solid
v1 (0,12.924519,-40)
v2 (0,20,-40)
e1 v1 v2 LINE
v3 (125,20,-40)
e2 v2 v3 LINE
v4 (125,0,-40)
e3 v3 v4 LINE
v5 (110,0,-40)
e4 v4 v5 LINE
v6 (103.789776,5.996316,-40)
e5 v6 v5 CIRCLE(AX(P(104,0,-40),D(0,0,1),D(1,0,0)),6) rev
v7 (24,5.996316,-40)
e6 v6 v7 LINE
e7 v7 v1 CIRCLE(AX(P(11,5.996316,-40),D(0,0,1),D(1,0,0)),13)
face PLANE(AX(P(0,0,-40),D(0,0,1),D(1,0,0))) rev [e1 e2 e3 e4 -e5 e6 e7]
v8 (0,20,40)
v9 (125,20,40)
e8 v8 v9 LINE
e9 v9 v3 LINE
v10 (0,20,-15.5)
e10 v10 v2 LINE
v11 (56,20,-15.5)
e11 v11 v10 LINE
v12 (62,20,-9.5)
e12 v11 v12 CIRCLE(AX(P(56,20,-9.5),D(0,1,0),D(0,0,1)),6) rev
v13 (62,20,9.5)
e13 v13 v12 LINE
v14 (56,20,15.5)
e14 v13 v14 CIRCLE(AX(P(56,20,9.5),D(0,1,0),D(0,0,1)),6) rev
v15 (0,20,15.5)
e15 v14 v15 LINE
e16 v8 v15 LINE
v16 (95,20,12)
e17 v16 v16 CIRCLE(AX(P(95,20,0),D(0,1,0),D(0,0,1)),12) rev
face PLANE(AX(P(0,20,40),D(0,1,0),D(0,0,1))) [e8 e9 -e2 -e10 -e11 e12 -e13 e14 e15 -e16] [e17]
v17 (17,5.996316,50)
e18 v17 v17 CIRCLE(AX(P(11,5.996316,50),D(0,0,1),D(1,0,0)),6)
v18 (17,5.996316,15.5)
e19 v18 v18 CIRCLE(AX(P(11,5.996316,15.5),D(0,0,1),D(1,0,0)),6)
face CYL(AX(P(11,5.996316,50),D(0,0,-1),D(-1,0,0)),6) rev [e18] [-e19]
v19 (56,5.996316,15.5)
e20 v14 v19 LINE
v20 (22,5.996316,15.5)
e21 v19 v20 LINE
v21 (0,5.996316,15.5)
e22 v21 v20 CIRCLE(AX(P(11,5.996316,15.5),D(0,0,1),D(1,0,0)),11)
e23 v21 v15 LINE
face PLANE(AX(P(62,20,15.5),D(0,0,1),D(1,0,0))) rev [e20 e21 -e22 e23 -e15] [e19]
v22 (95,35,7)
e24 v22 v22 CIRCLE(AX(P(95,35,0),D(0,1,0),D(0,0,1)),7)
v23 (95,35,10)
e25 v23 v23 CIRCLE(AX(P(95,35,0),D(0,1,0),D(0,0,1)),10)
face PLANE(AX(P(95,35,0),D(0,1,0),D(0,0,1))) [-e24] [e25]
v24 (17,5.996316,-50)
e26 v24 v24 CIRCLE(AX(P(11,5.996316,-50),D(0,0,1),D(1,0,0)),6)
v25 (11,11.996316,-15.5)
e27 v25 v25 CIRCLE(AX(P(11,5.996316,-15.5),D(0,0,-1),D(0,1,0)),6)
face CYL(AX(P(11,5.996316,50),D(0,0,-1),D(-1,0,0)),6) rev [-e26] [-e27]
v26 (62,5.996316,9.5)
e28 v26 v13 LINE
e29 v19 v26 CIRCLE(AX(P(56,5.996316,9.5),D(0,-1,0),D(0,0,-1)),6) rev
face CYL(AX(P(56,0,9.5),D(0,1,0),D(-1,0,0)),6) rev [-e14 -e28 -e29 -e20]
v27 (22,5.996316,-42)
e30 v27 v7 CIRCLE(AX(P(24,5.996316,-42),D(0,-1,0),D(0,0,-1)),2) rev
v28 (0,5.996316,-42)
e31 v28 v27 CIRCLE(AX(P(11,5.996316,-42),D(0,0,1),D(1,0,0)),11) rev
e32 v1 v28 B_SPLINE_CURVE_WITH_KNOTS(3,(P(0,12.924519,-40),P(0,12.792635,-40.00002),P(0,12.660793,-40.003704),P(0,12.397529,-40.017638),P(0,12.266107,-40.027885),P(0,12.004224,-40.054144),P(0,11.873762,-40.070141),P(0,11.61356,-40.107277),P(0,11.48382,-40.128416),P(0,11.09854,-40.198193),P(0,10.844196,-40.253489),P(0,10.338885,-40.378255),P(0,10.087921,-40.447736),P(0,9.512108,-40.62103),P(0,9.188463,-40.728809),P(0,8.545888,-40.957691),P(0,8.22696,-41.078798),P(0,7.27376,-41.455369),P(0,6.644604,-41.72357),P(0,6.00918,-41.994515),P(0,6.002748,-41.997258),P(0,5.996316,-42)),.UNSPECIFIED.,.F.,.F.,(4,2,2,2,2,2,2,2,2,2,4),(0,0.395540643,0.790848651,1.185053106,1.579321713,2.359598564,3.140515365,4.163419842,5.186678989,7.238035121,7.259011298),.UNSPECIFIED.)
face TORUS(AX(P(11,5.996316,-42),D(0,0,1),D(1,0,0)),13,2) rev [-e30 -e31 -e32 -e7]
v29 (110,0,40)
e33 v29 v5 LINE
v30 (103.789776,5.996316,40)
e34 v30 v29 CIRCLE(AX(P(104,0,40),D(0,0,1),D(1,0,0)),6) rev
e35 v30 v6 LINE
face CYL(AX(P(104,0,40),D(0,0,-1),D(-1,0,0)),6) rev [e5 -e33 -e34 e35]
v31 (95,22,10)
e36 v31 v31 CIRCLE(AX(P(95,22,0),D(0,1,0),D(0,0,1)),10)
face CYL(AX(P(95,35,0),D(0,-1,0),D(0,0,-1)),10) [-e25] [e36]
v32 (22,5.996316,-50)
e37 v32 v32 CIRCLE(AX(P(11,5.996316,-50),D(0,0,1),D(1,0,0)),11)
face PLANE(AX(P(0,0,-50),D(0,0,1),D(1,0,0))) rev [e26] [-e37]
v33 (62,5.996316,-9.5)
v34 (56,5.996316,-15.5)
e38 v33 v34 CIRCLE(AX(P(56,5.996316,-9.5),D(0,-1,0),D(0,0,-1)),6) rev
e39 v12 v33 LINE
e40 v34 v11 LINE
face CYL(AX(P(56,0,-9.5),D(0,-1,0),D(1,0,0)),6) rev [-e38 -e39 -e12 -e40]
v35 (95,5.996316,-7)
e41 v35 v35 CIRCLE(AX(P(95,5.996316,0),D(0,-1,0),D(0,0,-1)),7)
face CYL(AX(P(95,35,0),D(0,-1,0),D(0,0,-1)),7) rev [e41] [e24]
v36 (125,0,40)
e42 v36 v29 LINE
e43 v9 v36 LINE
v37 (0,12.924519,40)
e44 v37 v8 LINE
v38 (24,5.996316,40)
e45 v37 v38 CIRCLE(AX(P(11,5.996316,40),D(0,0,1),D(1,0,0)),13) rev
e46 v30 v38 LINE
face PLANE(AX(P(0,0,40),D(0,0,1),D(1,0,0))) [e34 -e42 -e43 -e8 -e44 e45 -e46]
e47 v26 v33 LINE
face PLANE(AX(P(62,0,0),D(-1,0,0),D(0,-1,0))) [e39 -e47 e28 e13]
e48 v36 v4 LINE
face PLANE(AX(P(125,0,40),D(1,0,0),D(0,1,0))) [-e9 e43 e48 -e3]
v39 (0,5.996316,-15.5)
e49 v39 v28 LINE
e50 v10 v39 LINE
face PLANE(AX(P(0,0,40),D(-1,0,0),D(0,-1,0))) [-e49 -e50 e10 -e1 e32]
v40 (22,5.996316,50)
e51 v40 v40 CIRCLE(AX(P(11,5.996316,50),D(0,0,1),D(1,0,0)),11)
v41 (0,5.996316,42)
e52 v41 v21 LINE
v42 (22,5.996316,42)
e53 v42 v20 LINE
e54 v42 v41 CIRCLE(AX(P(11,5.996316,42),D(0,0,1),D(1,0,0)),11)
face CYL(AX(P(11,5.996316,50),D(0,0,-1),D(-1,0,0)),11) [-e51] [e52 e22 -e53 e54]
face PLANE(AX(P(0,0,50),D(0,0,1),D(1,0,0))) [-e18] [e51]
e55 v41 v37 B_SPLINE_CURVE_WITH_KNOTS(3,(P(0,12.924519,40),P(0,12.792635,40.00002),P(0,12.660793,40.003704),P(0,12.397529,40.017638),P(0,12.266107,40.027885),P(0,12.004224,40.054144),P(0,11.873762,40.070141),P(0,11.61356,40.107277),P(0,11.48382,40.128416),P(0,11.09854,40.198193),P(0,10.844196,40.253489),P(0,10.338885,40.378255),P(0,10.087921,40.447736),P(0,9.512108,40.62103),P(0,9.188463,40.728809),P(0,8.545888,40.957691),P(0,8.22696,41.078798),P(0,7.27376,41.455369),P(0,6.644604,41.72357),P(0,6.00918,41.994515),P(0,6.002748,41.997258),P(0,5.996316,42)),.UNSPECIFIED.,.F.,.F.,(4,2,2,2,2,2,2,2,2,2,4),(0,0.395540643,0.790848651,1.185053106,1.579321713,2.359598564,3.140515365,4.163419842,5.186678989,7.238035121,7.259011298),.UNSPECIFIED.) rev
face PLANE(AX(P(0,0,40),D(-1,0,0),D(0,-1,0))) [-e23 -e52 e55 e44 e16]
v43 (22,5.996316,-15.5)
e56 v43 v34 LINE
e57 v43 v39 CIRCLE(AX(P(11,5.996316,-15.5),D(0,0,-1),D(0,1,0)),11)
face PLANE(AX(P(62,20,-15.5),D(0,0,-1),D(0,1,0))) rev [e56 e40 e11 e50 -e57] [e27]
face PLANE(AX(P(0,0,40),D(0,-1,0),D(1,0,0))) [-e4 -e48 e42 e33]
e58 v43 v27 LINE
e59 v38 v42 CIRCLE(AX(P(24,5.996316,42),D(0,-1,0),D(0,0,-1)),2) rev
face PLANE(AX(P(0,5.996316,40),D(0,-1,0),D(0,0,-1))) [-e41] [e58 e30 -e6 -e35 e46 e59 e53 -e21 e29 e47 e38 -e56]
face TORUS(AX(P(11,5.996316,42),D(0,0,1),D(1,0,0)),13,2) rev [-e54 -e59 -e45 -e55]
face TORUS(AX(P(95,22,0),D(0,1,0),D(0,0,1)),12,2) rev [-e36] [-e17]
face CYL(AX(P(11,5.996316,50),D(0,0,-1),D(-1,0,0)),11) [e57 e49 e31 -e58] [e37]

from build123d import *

# Parameters (mm, degrees)
BOSS_EXTRUDE3_DEPTH = 40
SKETCH1_5_R         = 11
SKETCH1_5_R_2       = 6
BOSS_EXTRUDE4_DEPTH = 50
SKETCH3_W           = 31
SKETCH3_H           = 25.003683984
CUT_EXTRUDE1_DEPTH  = 62
SKETCH4_R           = 10
SKETCH4_R_2         = 7
BOSS_EXTRUDE5_DEPTH = 15
FILLET1_R           = 2
FILLET2_R           = 6
CUT_EXTRUDE2_START  = -15
SKETCH4_2_R         = 7
CUT_EXTRUDE2_DEPTH  = 15


with BuildPart() as part:
    # Sketch1 → Boss-Extrude3 (new, symmetric)
    with BuildSketch(Plane.XY):
        with BuildLine():
            Line((125, 20), (0, 20))
            Line((0, 20), (0, 5.996316016))
            ThreePointArc((0, 5.996316016), (11, 16.996316016), (22, 5.996316016))
            Line((22, 5.996316016), (103.789775753, 5.996316016))
            ThreePointArc((103.789775753, 5.996316016), (108.167652488, 4.316326302), (110, 0))
            Line((110, 0), (125, 0))
            Line((125, 0), (125, 20))
        make_face()
    extrude(amount=BOSS_EXTRUDE3_DEPTH, both=True)

    # Sketch1<5> → Boss-Extrude4 (add, symmetric)
    with BuildSketch(Plane.XY):
        with Locations((11, 5.996316016)):
            Circle(SKETCH1_5_R)
        with Locations((11, 5.996316016)):
            Circle(SKETCH1_5_R_2, mode=Mode.SUBTRACT)
    extrude(amount=BOSS_EXTRUDE4_DEPTH, both=True)

    # Sketch3 → Cut-Extrude1 (cut)
    with BuildSketch(Plane.ZY):
        with Locations((0, 7.498158008)):
            Rectangle(SKETCH3_W, SKETCH3_H)
    extrude(amount=-CUT_EXTRUDE1_DEPTH, mode=Mode.SUBTRACT)

    # Sketch4 → Boss-Extrude5 (add)
    with BuildSketch(Plane(origin=(0, 20, 0), x_dir=(1, 0, 0), z_dir=(0, 1, 0))):
        with Locations(Location((95, 0, 0), (0, 0, 270))):
            Circle(SKETCH4_R)
        with Locations(Location((95, 0, 0), (0, 0, 270))):
            Circle(SKETCH4_R_2, mode=Mode.SUBTRACT)
    extrude(amount=BOSS_EXTRUDE5_DEPTH)

    # Fillet1
    # the kernel refuses this fillet: 2 mm, written as the material it adds along each edge
    with BuildSketch(Plane(origin=(11, 5.996316016, 40), x_dir=(-1, 0, 0), z_dir=(0, -1, 0))) as fillet1_piece_1_section:
        with BuildLine():
            CenterArc((11 + FILLET1_R, -FILLET1_R), FILLET1_R, 90, 90)
            Line((11 + FILLET1_R, 0), (11, 0))
            Line((11, 0), (11, -FILLET1_R))
        make_face()
    fillet1_piece_1 = revolve(axis=Axis((11, 5.996316016, 40), (0, 0, -1)), revolution_arc=180, mode=Mode.PRIVATE)
    fillet1_piece_1 = split(fillet1_piece_1, bisect_by=Plane(origin=(0, 17.026812535, 41), z_dir=(1, 0, 0)), keep=Keep.TOP, mode=Mode.PRIVATE)
    add(fillet1_piece_1)
    with BuildSketch(Plane(origin=(95, 20, 0), x_dir=(0, 0, 1), z_dir=(-1, 0, 0))) as fillet1_piece_2:
        with BuildLine():
            CenterArc((10 + FILLET1_R, FILLET1_R), FILLET1_R, 180, 90)
            Line((10, FILLET1_R), (10, 0))
            Line((10, 0), (10 + FILLET1_R, 0))
        make_face()
    revolve(axis=Axis((95, 20, 0), (0, 1, 0)))
    with BuildSketch(Plane(origin=(11, 5.996316016, -40), x_dir=(-1, 0, 0), z_dir=(0, -1, 0))) as fillet1_piece_3_section:
        with BuildLine():
            CenterArc((11 + FILLET1_R, FILLET1_R), FILLET1_R, 180, 90)
            Line((11 + FILLET1_R, 0), (11, 0))
            Line((11, 0), (11, FILLET1_R))
        make_face()
    fillet1_piece_3 = revolve(axis=Axis((11, 5.996316016, -40), (0, 0, -1)), revolution_arc=180, mode=Mode.PRIVATE)
    fillet1_piece_3 = split(fillet1_piece_3, bisect_by=Plane(origin=(0, 17.026812535, -41), z_dir=(1, 0, 0)), keep=Keep.TOP, mode=Mode.PRIVATE)
    add(fillet1_piece_3)

    # Fillet2
    fillet2_edges = [part.edges().sort_by_distance(p)[0] for p in [
        (62, 12.998158008, -15.5),
        (62, 12.998158008, 15.5),
    ]]
    fillet(fillet2_edges, radius=FILLET2_R)

    # Sketch4<2> → Cut-Extrude2 (cut)
    with BuildSketch(Plane(origin=(0, 20, 0), x_dir=(1, 0, 0), z_dir=(0, 1, 0)).offset(CUT_EXTRUDE2_START)):
        with Locations(Location((95, 0, 0), (0, 0, 90))):
            Circle(SKETCH4_2_R)
    extrude(amount=CUT_EXTRUDE2_DEPTH, mode=Mode.SUBTRACT)


solid = part.part
